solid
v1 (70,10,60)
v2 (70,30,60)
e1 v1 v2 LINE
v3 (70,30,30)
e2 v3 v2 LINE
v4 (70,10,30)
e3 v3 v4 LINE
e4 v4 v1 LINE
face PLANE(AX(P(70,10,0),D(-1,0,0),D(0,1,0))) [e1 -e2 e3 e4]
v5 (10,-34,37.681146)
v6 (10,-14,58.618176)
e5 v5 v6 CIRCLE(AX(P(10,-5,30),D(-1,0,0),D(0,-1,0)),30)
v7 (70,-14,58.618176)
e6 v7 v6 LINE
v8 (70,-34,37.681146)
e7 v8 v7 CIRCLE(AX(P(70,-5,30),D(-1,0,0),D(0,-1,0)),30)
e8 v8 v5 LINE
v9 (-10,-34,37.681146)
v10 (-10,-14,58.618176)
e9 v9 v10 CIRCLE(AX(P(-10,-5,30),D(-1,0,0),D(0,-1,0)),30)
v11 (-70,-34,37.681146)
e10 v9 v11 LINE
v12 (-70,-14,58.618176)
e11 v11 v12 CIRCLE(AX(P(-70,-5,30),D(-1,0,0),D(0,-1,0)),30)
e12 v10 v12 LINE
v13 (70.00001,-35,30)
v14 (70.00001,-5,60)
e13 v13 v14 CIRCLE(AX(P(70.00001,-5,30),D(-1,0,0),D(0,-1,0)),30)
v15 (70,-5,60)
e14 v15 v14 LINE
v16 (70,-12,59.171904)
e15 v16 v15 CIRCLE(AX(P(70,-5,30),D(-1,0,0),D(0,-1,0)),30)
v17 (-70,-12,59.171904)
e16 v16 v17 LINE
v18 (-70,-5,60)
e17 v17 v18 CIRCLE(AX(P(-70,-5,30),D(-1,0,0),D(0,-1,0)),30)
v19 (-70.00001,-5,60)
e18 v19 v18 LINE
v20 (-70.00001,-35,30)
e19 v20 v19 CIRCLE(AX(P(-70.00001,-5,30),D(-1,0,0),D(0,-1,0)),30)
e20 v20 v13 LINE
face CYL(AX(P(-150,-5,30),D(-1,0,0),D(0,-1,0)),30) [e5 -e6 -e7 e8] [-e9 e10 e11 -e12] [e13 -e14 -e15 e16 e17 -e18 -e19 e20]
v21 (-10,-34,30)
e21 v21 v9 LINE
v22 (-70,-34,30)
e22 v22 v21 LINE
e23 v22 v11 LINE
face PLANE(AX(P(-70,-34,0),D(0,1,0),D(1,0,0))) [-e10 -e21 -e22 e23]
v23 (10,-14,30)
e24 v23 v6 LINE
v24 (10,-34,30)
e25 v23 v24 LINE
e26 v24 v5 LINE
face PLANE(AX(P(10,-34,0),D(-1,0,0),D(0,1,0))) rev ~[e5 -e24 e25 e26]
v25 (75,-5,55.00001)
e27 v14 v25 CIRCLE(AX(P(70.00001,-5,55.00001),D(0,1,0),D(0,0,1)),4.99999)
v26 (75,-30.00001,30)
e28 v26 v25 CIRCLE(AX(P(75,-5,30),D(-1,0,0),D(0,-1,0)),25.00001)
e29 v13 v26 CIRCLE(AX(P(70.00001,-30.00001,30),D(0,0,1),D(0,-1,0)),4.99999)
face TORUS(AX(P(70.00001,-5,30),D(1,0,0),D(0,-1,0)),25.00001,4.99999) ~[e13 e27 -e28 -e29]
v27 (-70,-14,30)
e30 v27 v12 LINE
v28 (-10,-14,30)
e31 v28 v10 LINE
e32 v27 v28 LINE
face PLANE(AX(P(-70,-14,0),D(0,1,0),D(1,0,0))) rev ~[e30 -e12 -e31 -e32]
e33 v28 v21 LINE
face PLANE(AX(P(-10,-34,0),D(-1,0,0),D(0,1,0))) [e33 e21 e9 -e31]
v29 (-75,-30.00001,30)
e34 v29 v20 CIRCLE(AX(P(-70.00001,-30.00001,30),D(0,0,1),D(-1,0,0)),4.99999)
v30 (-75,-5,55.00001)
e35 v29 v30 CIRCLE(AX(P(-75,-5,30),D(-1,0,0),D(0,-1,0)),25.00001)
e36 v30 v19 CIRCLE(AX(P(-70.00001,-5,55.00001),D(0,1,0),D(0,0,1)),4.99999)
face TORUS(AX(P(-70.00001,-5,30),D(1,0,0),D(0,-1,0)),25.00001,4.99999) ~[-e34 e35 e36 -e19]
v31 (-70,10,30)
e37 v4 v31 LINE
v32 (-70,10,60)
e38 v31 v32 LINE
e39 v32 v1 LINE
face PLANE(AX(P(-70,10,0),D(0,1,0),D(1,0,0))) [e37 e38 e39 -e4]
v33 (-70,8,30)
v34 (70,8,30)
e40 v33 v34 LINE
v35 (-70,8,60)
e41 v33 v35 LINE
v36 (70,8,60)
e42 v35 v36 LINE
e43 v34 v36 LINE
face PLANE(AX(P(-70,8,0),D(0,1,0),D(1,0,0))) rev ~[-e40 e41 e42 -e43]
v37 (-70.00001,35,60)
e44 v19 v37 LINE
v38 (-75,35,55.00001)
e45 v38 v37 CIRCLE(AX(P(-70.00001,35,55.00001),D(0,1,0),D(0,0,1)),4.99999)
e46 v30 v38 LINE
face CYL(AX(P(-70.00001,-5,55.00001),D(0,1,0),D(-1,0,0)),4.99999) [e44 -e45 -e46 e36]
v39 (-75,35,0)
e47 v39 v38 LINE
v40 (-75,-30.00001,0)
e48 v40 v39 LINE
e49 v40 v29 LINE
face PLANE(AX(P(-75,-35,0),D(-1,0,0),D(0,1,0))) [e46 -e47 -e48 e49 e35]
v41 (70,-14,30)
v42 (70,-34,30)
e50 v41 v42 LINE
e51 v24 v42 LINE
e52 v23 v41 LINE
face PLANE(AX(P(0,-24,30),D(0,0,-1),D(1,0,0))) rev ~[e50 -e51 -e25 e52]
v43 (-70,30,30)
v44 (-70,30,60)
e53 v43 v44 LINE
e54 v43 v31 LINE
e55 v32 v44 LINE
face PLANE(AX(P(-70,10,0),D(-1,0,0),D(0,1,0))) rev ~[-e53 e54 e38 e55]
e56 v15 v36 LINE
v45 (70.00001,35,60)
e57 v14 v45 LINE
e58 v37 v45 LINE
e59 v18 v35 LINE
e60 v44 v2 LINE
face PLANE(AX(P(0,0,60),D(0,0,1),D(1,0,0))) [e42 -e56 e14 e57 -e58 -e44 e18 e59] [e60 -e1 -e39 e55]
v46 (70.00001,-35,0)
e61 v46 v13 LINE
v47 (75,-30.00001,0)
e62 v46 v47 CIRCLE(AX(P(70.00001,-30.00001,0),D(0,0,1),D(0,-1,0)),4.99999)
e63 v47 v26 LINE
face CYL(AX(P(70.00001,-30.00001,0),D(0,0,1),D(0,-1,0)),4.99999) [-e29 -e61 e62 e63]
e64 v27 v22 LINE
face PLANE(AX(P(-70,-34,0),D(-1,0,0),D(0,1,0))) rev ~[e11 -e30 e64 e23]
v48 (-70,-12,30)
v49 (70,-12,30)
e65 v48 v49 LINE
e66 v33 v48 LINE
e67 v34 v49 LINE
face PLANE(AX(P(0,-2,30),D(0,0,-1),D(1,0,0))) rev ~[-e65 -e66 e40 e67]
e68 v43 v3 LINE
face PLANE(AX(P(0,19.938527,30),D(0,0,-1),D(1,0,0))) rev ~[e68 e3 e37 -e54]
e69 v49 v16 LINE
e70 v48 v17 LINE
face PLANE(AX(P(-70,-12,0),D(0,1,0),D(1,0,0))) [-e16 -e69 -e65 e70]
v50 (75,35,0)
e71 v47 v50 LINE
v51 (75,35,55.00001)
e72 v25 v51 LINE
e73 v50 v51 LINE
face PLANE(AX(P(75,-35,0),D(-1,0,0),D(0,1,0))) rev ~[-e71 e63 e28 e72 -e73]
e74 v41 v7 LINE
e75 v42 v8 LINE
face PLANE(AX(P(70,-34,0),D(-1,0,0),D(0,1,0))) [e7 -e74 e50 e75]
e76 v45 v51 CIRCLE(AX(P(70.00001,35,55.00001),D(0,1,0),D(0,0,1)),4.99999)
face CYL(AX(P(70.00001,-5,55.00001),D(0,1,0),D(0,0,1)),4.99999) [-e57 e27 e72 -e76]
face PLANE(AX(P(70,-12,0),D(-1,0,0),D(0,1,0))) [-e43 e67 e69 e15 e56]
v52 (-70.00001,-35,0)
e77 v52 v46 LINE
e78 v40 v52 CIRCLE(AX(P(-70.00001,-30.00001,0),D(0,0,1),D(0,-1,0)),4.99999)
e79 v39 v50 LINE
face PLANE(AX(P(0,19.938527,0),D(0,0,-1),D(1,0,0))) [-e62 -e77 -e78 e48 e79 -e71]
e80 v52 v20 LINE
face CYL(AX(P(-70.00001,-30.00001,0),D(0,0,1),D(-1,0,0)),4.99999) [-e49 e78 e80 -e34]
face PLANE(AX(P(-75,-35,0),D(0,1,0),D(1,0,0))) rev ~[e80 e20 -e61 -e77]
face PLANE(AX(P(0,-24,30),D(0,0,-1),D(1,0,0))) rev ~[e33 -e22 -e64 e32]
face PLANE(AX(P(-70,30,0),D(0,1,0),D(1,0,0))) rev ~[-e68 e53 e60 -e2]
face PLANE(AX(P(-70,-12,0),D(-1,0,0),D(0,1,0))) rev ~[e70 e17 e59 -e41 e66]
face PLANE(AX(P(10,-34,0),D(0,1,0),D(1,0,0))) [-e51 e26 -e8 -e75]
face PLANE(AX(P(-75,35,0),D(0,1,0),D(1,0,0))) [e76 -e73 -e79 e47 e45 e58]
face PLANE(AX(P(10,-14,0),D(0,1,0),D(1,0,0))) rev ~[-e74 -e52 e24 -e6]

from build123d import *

# Parameters (mm, degrees)
F0_W        = 150
F0_H        = 70
F0_W_2      = 60
F0_H_2      = 20
F0_W_3      = 140
F1_DEPTH    = 60
F2_T1_DEPTH = 300
F3_R        = 4.99999
F4_W        = 140
F4_H        = 20.1229466498
F4_H_2      = 20
F5_DEPTH    = 30


# Not quite as in the source:
# - a fillet or chamfer that OpenCascade refuses, or shapes differently, is made with other operations: its cross-section is extruded or revolved along the edge and cut away or added
# - a fillet or chamfer is up to 0.001 mm smaller than in the source, because OpenCascade refuses the exact size


with BuildPart() as f1:
    # F0 (on Top) → F1 (new body)
    with BuildSketch(Plane.XY):
        Rectangle(F0_W, F0_H)
        with Locations((-40, -24)):
            Rectangle(F0_W_2, F0_H_2, mode=Mode.SUBTRACT)
        with Locations((40, -24)):
            Rectangle(F0_W_2, F0_H_2, mode=Mode.SUBTRACT)
        with Locations((0, -2)):
            Rectangle(F0_W_3, F0_H_2, mode=Mode.SUBTRACT)
        with Locations((0, 20)):
            Rectangle(F0_W_3, F0_H_2, mode=Mode.SUBTRACT)
    extrude(amount=F1_DEPTH)

    # F2: fillet of radius 30 on 1 edges, made by hand

    # F2_s2 → F2_t1 (cut)
    with BuildSketch(Plane.YZ.offset(-150)):
        with BuildLine():
            ThreePointArc((-35, 30), (-26.2132034356, 51.2132034356), (-5, 60))
            Line((-5, 60), (-35, 60))
            Line((-35, 60), (-35, 30))
        make_face()
    extrude(amount=F2_T1_DEPTH, mode=Mode.SUBTRACT)

    # F3 (radius 5 in the source; OpenCascade refuses exactly that, so slightly less here)
    f3_edges = [f1.edges().sort_by_distance(p)[0] for p in [
        (75, 15, 60),
        (-75, 15, 60),
    ]]
    fillet(f3_edges, radius=F3_R)

    # F4 (on face) → F5 (join)
    with BuildSketch(Plane(origin=(0, 0, 0), x_dir=(1, 0, 0), z_dir=(0, 0, -1))):
        with Locations((0, -19.9385266751)):
            Rectangle(F4_W, F4_H)
        with Locations((0, 2)):
            Rectangle(F4_W, F4_H_2)
        with Locations((0, 24)):
            Rectangle(F4_W, F4_H_2)
    extrude(amount=-F5_DEPTH)


solid = f1.part
